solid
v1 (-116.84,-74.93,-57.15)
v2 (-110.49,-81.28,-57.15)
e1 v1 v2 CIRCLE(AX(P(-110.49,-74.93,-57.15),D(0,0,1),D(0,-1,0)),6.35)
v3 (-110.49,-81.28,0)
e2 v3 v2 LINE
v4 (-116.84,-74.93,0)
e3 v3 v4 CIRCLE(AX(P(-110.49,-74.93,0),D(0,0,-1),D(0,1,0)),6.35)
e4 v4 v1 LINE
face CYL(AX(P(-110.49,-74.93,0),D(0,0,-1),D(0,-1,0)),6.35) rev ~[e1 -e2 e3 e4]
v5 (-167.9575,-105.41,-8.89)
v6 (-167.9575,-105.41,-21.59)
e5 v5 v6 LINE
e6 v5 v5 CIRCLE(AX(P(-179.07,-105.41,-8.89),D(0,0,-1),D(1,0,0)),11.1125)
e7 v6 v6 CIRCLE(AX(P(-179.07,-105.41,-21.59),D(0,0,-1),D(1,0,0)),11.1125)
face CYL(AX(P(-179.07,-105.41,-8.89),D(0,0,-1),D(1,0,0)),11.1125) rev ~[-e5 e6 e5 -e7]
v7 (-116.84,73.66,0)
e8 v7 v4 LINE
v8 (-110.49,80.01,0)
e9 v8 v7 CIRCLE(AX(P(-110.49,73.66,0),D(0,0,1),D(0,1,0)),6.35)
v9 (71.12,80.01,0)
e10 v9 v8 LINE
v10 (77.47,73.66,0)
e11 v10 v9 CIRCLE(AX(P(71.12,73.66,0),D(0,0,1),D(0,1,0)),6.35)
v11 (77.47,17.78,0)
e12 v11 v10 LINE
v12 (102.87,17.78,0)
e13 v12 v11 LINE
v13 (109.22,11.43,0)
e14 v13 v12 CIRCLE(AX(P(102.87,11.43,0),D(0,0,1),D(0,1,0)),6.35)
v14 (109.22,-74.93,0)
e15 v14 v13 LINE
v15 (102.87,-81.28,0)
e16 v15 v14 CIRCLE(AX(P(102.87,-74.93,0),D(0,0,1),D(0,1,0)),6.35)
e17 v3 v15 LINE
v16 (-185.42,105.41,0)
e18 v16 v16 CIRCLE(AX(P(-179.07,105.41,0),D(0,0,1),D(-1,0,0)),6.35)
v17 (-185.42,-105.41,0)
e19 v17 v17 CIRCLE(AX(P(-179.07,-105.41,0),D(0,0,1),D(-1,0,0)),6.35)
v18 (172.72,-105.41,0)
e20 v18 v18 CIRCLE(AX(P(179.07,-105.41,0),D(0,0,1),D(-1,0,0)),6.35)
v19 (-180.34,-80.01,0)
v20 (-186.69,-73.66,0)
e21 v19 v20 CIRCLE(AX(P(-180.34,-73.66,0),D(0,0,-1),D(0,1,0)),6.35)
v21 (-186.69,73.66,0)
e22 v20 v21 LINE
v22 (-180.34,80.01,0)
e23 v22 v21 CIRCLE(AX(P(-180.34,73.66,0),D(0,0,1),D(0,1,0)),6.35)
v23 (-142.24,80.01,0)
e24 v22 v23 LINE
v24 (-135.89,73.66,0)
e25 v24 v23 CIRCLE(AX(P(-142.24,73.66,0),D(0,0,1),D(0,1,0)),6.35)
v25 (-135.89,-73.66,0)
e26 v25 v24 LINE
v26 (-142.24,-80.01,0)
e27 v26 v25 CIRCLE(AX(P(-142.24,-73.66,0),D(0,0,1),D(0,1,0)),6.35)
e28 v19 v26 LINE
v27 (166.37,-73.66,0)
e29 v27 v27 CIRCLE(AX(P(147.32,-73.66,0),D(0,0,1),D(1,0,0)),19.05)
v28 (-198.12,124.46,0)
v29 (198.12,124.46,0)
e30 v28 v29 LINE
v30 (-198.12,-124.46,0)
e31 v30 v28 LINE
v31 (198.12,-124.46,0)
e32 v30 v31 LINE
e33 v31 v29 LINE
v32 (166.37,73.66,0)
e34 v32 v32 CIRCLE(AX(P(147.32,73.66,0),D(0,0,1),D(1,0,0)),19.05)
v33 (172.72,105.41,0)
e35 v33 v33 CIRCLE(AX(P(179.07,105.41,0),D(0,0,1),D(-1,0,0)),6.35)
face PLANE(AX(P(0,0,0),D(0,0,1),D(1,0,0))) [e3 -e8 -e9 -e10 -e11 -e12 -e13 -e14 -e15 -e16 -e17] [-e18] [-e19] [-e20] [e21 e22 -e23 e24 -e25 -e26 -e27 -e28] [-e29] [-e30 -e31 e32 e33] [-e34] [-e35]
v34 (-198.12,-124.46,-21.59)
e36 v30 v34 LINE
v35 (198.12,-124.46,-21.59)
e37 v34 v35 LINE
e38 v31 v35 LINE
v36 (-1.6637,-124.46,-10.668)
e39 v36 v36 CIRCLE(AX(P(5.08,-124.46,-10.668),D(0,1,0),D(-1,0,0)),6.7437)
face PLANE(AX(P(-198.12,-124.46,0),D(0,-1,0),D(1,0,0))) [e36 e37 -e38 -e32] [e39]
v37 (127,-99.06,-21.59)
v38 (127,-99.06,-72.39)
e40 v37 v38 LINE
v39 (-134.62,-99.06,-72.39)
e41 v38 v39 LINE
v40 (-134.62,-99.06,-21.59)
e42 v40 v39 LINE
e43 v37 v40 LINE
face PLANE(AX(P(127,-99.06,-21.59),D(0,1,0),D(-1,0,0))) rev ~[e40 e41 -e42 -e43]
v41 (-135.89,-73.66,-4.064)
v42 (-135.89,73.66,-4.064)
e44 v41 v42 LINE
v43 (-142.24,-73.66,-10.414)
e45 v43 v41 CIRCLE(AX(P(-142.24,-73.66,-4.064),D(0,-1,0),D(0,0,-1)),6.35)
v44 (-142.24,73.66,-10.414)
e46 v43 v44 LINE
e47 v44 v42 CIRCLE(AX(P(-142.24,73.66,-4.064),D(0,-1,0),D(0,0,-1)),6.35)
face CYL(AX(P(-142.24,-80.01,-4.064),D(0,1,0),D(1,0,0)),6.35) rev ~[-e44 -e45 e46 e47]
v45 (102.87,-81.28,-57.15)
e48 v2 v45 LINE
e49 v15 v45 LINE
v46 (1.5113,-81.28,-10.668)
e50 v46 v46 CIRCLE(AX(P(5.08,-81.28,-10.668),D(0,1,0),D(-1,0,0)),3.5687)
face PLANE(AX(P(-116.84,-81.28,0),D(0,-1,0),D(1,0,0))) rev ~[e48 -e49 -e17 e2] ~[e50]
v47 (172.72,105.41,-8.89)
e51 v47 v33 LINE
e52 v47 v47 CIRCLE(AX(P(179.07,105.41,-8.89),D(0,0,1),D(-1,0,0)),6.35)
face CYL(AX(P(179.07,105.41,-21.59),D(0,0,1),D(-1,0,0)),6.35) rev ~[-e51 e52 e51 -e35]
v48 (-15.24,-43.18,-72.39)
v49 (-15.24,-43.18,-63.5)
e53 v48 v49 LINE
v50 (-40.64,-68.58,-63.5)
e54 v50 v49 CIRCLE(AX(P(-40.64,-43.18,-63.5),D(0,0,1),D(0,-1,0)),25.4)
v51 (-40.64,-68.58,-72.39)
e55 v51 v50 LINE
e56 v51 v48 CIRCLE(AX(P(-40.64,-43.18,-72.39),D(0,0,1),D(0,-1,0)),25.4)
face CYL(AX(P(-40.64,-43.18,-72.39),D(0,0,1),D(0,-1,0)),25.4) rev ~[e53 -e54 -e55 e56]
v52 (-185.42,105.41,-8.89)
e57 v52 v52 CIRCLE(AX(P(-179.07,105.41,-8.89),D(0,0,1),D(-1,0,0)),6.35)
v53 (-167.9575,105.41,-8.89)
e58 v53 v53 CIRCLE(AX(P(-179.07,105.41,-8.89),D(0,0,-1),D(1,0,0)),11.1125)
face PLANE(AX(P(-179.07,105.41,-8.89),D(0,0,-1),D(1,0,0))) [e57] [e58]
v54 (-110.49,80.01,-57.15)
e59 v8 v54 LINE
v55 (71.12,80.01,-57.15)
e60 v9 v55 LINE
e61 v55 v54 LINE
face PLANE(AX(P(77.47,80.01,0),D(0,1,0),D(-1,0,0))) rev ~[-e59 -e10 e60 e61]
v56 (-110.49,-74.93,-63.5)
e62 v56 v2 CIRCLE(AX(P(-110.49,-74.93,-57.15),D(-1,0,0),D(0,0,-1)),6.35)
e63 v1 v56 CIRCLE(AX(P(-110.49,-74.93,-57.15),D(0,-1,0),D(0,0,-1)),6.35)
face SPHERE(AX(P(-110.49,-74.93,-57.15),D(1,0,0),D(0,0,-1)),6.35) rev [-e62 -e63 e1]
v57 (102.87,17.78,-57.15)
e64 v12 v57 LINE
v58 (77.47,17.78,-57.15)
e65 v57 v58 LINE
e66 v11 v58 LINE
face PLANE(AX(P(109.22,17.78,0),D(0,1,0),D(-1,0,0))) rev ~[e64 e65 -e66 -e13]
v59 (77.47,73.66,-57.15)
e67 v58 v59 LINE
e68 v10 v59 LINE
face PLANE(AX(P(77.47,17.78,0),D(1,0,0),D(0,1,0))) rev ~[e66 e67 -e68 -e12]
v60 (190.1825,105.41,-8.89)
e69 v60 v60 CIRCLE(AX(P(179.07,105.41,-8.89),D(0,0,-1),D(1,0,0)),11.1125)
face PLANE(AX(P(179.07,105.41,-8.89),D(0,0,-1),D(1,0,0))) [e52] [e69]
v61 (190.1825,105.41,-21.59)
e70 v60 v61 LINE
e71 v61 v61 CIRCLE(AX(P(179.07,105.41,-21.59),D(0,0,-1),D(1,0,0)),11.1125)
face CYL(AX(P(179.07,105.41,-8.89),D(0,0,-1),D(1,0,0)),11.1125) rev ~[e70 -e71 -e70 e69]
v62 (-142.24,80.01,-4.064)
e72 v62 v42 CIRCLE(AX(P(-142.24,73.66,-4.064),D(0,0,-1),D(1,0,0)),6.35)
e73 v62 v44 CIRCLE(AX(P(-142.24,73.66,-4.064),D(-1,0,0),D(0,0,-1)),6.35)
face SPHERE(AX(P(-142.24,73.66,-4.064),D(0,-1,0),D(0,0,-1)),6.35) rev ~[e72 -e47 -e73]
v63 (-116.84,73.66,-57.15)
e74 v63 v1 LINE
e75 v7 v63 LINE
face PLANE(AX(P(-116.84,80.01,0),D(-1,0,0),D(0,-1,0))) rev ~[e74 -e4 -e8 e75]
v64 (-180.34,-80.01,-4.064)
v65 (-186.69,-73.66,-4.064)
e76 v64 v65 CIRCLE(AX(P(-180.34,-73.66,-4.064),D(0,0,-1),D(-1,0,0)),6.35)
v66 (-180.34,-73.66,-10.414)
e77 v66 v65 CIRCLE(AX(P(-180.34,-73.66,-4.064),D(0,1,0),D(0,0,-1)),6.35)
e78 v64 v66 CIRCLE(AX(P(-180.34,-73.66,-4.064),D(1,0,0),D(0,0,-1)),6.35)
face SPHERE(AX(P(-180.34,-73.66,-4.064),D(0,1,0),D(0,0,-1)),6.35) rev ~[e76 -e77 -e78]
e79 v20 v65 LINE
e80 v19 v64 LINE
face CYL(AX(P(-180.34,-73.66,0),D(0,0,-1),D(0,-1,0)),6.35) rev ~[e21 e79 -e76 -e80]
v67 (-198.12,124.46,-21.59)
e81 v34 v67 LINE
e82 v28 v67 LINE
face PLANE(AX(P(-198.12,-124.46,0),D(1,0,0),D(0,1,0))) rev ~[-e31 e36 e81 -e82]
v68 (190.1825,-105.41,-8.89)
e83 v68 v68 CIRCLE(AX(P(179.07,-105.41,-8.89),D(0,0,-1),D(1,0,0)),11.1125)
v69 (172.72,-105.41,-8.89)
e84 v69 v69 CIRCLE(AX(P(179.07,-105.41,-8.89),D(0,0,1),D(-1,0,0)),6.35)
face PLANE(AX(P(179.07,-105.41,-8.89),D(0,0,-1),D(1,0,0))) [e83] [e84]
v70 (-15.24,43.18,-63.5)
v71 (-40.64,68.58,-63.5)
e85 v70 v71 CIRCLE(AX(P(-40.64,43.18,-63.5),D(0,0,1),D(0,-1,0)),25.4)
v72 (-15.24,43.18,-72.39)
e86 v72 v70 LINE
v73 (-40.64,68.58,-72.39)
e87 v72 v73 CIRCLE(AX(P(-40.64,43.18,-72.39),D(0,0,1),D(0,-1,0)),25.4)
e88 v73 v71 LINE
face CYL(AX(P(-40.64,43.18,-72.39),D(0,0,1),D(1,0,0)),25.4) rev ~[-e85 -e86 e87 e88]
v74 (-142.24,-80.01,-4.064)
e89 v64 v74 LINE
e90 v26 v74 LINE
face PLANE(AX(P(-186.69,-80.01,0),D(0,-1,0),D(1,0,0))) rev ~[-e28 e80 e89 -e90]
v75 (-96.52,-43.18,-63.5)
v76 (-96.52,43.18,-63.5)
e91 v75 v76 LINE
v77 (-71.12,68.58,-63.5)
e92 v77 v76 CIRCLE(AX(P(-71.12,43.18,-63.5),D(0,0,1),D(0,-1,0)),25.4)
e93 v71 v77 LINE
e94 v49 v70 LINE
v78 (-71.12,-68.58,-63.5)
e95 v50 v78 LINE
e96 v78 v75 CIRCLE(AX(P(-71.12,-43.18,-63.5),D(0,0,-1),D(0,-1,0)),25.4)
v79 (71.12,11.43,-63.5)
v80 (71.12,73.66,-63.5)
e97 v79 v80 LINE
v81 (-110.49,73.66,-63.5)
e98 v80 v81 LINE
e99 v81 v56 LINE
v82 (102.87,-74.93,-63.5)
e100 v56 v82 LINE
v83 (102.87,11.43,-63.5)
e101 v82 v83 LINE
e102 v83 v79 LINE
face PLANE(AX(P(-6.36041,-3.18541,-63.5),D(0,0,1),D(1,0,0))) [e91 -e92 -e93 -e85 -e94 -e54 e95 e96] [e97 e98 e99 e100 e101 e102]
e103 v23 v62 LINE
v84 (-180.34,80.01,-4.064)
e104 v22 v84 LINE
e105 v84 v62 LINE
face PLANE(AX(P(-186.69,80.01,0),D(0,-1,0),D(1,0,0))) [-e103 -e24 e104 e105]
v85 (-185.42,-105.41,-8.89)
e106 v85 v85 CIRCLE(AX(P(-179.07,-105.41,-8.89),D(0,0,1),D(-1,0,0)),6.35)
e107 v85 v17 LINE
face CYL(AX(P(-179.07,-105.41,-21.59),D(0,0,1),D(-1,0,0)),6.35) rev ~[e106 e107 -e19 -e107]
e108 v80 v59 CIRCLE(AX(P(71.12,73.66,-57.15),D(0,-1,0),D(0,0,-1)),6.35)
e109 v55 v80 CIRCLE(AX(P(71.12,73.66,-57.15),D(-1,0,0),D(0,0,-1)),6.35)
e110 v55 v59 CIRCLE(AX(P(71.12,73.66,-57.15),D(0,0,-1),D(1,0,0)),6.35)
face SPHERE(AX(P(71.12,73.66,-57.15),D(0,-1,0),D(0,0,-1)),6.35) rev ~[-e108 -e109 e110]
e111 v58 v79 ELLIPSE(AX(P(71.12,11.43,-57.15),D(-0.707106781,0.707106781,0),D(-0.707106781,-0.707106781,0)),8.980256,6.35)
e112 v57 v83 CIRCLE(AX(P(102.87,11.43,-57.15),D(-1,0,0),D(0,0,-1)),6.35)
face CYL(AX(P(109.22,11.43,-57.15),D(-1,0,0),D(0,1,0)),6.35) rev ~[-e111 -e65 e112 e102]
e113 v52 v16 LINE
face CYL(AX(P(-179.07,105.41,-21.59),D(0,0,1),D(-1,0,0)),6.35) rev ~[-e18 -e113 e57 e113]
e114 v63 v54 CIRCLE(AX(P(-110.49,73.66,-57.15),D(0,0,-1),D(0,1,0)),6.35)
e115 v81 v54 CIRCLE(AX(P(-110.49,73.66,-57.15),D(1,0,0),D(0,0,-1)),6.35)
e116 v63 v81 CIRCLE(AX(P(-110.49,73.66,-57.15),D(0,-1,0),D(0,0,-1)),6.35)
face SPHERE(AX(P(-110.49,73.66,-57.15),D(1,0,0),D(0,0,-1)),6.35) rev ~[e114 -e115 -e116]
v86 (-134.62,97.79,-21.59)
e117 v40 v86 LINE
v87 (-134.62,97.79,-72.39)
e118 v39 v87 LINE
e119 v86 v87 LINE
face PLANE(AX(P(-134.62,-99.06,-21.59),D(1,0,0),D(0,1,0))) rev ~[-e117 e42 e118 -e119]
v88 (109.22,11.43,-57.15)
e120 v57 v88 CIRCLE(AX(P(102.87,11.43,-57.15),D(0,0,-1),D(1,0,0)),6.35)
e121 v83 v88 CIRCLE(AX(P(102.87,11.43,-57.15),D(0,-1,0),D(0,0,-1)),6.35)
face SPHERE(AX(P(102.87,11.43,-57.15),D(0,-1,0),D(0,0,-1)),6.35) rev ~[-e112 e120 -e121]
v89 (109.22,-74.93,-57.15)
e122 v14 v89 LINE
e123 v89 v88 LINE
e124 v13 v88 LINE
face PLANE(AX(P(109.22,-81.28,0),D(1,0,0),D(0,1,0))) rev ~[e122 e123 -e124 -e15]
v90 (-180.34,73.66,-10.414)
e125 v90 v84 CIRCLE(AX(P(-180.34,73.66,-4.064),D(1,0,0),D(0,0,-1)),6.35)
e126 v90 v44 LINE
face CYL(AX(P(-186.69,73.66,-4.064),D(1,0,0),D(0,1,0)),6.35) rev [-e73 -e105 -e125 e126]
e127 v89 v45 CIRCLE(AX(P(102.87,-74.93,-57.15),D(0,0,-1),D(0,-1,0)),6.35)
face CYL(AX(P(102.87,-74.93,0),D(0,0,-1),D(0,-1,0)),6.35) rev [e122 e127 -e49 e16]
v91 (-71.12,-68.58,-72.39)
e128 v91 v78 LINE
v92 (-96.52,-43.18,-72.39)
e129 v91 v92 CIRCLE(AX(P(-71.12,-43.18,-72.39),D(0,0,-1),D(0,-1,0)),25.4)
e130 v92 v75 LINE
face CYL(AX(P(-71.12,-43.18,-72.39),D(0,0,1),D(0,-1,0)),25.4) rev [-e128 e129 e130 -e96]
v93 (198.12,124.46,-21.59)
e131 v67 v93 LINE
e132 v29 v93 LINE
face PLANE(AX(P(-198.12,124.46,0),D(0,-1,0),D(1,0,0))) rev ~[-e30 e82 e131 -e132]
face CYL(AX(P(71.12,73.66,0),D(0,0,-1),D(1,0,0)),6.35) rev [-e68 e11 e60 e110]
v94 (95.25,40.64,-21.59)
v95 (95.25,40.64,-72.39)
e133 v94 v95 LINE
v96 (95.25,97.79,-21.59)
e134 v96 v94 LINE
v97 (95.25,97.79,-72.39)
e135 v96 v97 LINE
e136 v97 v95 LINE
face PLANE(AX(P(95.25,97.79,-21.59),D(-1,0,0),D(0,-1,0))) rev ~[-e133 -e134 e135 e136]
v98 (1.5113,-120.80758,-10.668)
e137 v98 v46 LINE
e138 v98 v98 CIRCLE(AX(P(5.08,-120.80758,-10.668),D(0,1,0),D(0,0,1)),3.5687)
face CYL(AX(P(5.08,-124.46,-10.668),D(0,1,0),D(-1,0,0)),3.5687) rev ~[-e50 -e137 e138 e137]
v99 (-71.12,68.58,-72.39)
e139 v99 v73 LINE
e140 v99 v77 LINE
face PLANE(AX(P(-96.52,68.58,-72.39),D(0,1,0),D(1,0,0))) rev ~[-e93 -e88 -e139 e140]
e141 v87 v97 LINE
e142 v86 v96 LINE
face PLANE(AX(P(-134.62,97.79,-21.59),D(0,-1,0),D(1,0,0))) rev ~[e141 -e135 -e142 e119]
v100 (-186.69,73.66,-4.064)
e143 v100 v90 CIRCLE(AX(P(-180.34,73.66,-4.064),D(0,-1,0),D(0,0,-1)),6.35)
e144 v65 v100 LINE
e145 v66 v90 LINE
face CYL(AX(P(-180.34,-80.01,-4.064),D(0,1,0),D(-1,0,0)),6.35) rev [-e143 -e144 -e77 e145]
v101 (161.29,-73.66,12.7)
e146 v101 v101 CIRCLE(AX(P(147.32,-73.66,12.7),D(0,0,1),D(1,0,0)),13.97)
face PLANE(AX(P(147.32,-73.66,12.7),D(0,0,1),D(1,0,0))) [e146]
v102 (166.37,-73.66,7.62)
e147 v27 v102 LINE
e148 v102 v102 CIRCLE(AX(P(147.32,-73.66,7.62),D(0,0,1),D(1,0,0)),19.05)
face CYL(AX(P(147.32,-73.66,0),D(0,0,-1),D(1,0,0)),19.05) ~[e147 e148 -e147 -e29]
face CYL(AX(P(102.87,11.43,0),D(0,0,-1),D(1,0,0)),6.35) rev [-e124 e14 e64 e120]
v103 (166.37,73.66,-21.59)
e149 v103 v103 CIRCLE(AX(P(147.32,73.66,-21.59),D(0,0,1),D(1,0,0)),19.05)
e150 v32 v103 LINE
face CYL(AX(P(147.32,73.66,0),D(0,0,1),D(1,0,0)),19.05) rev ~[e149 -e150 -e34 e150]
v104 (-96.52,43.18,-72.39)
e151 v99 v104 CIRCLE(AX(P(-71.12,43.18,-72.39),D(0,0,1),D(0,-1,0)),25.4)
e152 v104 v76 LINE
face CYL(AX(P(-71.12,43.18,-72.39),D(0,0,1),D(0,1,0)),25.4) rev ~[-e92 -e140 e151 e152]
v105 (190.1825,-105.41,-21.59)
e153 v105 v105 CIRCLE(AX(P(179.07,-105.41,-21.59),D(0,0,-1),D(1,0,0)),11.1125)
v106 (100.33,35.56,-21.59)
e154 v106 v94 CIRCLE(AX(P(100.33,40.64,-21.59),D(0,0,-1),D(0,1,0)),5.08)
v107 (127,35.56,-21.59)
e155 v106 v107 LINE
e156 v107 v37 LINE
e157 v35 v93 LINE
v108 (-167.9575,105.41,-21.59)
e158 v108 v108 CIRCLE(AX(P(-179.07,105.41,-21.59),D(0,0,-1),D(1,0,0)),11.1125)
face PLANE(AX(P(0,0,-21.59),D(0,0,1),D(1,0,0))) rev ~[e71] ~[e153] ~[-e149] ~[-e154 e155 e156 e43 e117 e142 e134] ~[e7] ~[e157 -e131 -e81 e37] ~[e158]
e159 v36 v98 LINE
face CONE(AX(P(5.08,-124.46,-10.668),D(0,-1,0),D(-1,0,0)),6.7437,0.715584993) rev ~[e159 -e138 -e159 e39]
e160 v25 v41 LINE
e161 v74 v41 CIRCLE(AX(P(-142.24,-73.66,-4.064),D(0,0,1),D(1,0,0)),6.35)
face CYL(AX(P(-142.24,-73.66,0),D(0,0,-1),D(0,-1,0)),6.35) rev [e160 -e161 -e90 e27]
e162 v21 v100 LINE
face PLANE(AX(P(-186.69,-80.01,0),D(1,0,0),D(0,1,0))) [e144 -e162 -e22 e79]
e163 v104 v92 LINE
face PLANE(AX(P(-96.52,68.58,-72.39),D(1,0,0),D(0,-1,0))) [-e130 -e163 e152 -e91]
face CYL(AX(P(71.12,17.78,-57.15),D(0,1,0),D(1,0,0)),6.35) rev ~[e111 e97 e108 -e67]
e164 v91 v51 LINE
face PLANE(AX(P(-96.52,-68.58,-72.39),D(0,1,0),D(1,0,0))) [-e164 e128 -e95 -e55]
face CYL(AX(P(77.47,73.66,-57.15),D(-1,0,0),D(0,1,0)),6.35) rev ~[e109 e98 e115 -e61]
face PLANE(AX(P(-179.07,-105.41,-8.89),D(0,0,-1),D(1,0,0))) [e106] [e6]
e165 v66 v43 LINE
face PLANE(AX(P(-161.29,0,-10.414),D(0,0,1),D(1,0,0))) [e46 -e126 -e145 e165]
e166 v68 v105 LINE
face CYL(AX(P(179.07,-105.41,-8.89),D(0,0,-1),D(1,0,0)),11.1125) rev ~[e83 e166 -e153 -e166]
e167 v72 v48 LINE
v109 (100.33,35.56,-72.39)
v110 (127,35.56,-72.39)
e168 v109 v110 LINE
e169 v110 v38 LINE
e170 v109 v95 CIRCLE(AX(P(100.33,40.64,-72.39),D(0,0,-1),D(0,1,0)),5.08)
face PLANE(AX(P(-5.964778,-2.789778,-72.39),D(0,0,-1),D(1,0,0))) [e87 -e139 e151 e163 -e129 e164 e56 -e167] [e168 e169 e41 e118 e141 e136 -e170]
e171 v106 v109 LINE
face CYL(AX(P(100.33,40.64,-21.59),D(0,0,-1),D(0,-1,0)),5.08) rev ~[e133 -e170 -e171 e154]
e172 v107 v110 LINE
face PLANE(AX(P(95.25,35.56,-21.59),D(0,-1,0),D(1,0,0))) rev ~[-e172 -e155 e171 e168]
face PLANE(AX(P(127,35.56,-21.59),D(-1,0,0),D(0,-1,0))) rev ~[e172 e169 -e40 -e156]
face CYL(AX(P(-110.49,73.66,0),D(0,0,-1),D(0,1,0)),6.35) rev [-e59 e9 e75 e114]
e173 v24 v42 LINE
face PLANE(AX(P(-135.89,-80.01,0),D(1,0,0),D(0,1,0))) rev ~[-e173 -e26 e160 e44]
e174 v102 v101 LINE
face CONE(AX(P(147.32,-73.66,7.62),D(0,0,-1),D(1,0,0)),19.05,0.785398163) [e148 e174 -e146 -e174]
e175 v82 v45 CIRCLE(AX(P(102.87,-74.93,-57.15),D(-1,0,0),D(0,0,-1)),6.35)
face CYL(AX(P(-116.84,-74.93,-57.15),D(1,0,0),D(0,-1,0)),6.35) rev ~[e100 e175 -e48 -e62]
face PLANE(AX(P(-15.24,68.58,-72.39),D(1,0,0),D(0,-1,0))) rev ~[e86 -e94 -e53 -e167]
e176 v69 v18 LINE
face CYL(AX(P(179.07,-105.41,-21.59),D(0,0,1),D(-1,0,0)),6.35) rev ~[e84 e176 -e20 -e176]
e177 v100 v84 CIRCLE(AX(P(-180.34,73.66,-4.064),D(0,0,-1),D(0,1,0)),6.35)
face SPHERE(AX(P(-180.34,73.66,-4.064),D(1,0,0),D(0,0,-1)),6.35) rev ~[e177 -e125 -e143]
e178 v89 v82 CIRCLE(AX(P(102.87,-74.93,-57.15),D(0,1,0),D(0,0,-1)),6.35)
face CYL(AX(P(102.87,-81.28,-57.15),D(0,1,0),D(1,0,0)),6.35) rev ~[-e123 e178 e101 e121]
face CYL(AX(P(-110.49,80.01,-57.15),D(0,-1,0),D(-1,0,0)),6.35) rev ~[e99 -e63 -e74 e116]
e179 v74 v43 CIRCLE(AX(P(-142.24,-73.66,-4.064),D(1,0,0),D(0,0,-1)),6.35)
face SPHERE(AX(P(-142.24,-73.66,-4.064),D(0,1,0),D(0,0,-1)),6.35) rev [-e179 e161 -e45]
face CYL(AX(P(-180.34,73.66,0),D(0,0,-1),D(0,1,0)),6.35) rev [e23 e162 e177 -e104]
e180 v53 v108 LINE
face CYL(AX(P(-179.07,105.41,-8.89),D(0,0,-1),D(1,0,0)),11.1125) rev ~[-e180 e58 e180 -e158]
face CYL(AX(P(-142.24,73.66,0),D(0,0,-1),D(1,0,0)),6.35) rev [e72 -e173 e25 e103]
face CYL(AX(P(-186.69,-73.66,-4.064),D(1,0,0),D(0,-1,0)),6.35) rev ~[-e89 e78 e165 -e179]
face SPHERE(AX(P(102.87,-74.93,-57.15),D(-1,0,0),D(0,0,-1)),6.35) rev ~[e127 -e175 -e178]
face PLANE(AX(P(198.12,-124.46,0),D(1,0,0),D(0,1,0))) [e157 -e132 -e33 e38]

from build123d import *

# Parameters (mm, degrees)
F0_W            = 396.24
F0_H            = 248.92
F1_DEPTH        = 21.59
F3_DEPTH        = 50.8
F5_DEPTH        = 63.5
F6_R            = 6.35
F7_R            = 5.08
F8_W            = 81.28
F8_H            = 137.16
F9_DEPTH        = 72.391
F10_W           = 50.8
F10_H           = 160.02
F11_DEPTH       = 10.414
F12_R           = 6.35
F13_R           = 19.05
F14_DEPTH       = 12.7
F15_SIZE        = 5.08
F17_D           = 7.1374
F17_DEPTH       = 127
F17_CSINK_D     = 13.4874
F17_CSINK_ANGLE = 82
F17_TIP         = 2.1442912911
F19_D           = 12.7
F19_CBORE_D     = 22.225
F19_CBORE_DEPTH = 12.7
F20_R           = 19.05
F21_DEPTH       = 72.391
F22_R           = 25.4


with BuildPart() as f1:
    # F0 (on Top) → F1 (new body)
    with BuildSketch(Plane.XY):
        Rectangle(F0_W, F0_H)
    extrude(amount=-F1_DEPTH)

    # F2 (on face) → F3 (join)
    with BuildSketch(Plane(origin=(0, 0, -21.59), x_dir=(1, 0, 0), z_dir=(0, 0, -1))):
        Polygon((127, 99.06), (-134.62, 99.06), (-134.62, -97.79), (95.25, -97.79), (95.25, -35.56), (127, -35.56), align=None)
    extrude(amount=F3_DEPTH)

    # F4 (on face) → F5 (cut)
    with BuildSketch(Plane.XY):
        Polygon((-116.84, -81.28), (109.22, -81.28), (109.22, 17.78), (77.47, 17.78), (77.47, 80.01), (-116.84, 80.01), align=None)
    extrude(amount=-F5_DEPTH, mode=Mode.SUBTRACT)

    # F6
    f6_edges = [f1.edges().sort_by_distance(p)[0] for p in [
        (-3.81, -81.28, -63.5),
        (109.22, -31.75, -63.5),
        (93.345, 17.78, -63.5),
        (77.47, 48.895, -63.5),
        (-19.685, 80.01, -63.5),
        (-116.84, -0.635, -63.5),
        (109.22, -81.28, -31.75),
        (-116.84, -81.28, -31.75),
        (-116.84, 80.01, -31.75),
        (109.22, 17.78, -31.75),
        (77.47, 80.01, -31.75),
    ]]
    fillet(f6_edges, radius=F6_R)

    # F7
    f7_edges = [f1.edges().sort_by_distance(p)[0] for p in [
        (95.25, 35.56, -46.99),
    ]]
    fillet(f7_edges, radius=F7_R)

    # F8 (on face) → F9 (cut, through all)
    with BuildSketch(Plane(origin=(0, 0, -72.39), x_dir=(1, 0, 0), z_dir=(0, 0, -1))):
        with Locations((-55.88, 0)):
            Rectangle(F8_W, F8_H)
    extrude(amount=-F9_DEPTH, mode=Mode.SUBTRACT)

    # F10 (on face) → F11 (cut)
    with BuildSketch(Plane.XY):
        with Locations((-161.29, 0)):
            Rectangle(F10_W, F10_H)
    extrude(amount=-F11_DEPTH, mode=Mode.SUBTRACT)

    # F12
    f12_edges = [f1.edges().sort_by_distance(p)[0] for p in [
        (-135.89, 0, -10.414),
        (-161.29, 80.01, -10.414),
        (-186.69, 0, -10.414),
        (-161.29, -80.01, -10.414),
        (-186.69, 80.01, -5.207),
        (-135.89, 80.01, -5.207),
        (-135.89, -80.01, -5.207),
        (-186.69, -80.01, -5.207),
    ]]
    fillet(f12_edges, radius=F12_R)

    # F13 (on face) → F14 (join)
    with BuildSketch(Plane.XY):
        with Locations((147.32, -73.66)):
            Circle(F13_R)
    extrude(amount=F14_DEPTH)

    # F15
    f15_edges = [f1.edges().sort_by_distance(p)[0] for p in [
        (128.27, -73.66, 12.7),
    ]]
    chamfer(f15_edges, length=F15_SIZE)

    # F17
    with Locations(Plane.XZ.offset(124.46)):
        with Locations((5.08, -10.668)):
            CounterSinkHole(F17_D / 2, F17_CSINK_D / 2, depth=F17_DEPTH, counter_sink_angle=F17_CSINK_ANGLE)
            with Locations((0, 0, -(F17_DEPTH + F17_TIP / 2))):  # 118° drill point
                Cone(0, F17_D / 2, F17_TIP, mode=Mode.SUBTRACT)

    # F19 (through all)
    with Locations(Plane(origin=(0, 0, -21.59), x_dir=(1, 0, 0), z_dir=(0, 0, -1))):
        with Locations((-179.07, 105.41), (179.07, 105.41), (179.07, -105.41), (-179.07, -105.41)):
            CounterBoreHole(F19_D / 2, F19_CBORE_D / 2, F19_CBORE_DEPTH)

    # F20 (on face) → F21 (cut, through all)
    with BuildSketch(Plane.XY):
        with Locations((147.32, 73.66)):
            Circle(F20_R)
    extrude(amount=-F21_DEPTH, mode=Mode.SUBTRACT)

    # F22
    f22_edges = [f1.edges().sort_by_distance(p)[0] for p in [
        (-15.24, -68.58, -67.945),
        (-15.24, 68.58, -67.945),
        (-96.52, 68.58, -67.945),
        (-96.52, -68.58, -67.945),
    ]]
    fillet(f22_edges, radius=F22_R)


solid = f1.part
